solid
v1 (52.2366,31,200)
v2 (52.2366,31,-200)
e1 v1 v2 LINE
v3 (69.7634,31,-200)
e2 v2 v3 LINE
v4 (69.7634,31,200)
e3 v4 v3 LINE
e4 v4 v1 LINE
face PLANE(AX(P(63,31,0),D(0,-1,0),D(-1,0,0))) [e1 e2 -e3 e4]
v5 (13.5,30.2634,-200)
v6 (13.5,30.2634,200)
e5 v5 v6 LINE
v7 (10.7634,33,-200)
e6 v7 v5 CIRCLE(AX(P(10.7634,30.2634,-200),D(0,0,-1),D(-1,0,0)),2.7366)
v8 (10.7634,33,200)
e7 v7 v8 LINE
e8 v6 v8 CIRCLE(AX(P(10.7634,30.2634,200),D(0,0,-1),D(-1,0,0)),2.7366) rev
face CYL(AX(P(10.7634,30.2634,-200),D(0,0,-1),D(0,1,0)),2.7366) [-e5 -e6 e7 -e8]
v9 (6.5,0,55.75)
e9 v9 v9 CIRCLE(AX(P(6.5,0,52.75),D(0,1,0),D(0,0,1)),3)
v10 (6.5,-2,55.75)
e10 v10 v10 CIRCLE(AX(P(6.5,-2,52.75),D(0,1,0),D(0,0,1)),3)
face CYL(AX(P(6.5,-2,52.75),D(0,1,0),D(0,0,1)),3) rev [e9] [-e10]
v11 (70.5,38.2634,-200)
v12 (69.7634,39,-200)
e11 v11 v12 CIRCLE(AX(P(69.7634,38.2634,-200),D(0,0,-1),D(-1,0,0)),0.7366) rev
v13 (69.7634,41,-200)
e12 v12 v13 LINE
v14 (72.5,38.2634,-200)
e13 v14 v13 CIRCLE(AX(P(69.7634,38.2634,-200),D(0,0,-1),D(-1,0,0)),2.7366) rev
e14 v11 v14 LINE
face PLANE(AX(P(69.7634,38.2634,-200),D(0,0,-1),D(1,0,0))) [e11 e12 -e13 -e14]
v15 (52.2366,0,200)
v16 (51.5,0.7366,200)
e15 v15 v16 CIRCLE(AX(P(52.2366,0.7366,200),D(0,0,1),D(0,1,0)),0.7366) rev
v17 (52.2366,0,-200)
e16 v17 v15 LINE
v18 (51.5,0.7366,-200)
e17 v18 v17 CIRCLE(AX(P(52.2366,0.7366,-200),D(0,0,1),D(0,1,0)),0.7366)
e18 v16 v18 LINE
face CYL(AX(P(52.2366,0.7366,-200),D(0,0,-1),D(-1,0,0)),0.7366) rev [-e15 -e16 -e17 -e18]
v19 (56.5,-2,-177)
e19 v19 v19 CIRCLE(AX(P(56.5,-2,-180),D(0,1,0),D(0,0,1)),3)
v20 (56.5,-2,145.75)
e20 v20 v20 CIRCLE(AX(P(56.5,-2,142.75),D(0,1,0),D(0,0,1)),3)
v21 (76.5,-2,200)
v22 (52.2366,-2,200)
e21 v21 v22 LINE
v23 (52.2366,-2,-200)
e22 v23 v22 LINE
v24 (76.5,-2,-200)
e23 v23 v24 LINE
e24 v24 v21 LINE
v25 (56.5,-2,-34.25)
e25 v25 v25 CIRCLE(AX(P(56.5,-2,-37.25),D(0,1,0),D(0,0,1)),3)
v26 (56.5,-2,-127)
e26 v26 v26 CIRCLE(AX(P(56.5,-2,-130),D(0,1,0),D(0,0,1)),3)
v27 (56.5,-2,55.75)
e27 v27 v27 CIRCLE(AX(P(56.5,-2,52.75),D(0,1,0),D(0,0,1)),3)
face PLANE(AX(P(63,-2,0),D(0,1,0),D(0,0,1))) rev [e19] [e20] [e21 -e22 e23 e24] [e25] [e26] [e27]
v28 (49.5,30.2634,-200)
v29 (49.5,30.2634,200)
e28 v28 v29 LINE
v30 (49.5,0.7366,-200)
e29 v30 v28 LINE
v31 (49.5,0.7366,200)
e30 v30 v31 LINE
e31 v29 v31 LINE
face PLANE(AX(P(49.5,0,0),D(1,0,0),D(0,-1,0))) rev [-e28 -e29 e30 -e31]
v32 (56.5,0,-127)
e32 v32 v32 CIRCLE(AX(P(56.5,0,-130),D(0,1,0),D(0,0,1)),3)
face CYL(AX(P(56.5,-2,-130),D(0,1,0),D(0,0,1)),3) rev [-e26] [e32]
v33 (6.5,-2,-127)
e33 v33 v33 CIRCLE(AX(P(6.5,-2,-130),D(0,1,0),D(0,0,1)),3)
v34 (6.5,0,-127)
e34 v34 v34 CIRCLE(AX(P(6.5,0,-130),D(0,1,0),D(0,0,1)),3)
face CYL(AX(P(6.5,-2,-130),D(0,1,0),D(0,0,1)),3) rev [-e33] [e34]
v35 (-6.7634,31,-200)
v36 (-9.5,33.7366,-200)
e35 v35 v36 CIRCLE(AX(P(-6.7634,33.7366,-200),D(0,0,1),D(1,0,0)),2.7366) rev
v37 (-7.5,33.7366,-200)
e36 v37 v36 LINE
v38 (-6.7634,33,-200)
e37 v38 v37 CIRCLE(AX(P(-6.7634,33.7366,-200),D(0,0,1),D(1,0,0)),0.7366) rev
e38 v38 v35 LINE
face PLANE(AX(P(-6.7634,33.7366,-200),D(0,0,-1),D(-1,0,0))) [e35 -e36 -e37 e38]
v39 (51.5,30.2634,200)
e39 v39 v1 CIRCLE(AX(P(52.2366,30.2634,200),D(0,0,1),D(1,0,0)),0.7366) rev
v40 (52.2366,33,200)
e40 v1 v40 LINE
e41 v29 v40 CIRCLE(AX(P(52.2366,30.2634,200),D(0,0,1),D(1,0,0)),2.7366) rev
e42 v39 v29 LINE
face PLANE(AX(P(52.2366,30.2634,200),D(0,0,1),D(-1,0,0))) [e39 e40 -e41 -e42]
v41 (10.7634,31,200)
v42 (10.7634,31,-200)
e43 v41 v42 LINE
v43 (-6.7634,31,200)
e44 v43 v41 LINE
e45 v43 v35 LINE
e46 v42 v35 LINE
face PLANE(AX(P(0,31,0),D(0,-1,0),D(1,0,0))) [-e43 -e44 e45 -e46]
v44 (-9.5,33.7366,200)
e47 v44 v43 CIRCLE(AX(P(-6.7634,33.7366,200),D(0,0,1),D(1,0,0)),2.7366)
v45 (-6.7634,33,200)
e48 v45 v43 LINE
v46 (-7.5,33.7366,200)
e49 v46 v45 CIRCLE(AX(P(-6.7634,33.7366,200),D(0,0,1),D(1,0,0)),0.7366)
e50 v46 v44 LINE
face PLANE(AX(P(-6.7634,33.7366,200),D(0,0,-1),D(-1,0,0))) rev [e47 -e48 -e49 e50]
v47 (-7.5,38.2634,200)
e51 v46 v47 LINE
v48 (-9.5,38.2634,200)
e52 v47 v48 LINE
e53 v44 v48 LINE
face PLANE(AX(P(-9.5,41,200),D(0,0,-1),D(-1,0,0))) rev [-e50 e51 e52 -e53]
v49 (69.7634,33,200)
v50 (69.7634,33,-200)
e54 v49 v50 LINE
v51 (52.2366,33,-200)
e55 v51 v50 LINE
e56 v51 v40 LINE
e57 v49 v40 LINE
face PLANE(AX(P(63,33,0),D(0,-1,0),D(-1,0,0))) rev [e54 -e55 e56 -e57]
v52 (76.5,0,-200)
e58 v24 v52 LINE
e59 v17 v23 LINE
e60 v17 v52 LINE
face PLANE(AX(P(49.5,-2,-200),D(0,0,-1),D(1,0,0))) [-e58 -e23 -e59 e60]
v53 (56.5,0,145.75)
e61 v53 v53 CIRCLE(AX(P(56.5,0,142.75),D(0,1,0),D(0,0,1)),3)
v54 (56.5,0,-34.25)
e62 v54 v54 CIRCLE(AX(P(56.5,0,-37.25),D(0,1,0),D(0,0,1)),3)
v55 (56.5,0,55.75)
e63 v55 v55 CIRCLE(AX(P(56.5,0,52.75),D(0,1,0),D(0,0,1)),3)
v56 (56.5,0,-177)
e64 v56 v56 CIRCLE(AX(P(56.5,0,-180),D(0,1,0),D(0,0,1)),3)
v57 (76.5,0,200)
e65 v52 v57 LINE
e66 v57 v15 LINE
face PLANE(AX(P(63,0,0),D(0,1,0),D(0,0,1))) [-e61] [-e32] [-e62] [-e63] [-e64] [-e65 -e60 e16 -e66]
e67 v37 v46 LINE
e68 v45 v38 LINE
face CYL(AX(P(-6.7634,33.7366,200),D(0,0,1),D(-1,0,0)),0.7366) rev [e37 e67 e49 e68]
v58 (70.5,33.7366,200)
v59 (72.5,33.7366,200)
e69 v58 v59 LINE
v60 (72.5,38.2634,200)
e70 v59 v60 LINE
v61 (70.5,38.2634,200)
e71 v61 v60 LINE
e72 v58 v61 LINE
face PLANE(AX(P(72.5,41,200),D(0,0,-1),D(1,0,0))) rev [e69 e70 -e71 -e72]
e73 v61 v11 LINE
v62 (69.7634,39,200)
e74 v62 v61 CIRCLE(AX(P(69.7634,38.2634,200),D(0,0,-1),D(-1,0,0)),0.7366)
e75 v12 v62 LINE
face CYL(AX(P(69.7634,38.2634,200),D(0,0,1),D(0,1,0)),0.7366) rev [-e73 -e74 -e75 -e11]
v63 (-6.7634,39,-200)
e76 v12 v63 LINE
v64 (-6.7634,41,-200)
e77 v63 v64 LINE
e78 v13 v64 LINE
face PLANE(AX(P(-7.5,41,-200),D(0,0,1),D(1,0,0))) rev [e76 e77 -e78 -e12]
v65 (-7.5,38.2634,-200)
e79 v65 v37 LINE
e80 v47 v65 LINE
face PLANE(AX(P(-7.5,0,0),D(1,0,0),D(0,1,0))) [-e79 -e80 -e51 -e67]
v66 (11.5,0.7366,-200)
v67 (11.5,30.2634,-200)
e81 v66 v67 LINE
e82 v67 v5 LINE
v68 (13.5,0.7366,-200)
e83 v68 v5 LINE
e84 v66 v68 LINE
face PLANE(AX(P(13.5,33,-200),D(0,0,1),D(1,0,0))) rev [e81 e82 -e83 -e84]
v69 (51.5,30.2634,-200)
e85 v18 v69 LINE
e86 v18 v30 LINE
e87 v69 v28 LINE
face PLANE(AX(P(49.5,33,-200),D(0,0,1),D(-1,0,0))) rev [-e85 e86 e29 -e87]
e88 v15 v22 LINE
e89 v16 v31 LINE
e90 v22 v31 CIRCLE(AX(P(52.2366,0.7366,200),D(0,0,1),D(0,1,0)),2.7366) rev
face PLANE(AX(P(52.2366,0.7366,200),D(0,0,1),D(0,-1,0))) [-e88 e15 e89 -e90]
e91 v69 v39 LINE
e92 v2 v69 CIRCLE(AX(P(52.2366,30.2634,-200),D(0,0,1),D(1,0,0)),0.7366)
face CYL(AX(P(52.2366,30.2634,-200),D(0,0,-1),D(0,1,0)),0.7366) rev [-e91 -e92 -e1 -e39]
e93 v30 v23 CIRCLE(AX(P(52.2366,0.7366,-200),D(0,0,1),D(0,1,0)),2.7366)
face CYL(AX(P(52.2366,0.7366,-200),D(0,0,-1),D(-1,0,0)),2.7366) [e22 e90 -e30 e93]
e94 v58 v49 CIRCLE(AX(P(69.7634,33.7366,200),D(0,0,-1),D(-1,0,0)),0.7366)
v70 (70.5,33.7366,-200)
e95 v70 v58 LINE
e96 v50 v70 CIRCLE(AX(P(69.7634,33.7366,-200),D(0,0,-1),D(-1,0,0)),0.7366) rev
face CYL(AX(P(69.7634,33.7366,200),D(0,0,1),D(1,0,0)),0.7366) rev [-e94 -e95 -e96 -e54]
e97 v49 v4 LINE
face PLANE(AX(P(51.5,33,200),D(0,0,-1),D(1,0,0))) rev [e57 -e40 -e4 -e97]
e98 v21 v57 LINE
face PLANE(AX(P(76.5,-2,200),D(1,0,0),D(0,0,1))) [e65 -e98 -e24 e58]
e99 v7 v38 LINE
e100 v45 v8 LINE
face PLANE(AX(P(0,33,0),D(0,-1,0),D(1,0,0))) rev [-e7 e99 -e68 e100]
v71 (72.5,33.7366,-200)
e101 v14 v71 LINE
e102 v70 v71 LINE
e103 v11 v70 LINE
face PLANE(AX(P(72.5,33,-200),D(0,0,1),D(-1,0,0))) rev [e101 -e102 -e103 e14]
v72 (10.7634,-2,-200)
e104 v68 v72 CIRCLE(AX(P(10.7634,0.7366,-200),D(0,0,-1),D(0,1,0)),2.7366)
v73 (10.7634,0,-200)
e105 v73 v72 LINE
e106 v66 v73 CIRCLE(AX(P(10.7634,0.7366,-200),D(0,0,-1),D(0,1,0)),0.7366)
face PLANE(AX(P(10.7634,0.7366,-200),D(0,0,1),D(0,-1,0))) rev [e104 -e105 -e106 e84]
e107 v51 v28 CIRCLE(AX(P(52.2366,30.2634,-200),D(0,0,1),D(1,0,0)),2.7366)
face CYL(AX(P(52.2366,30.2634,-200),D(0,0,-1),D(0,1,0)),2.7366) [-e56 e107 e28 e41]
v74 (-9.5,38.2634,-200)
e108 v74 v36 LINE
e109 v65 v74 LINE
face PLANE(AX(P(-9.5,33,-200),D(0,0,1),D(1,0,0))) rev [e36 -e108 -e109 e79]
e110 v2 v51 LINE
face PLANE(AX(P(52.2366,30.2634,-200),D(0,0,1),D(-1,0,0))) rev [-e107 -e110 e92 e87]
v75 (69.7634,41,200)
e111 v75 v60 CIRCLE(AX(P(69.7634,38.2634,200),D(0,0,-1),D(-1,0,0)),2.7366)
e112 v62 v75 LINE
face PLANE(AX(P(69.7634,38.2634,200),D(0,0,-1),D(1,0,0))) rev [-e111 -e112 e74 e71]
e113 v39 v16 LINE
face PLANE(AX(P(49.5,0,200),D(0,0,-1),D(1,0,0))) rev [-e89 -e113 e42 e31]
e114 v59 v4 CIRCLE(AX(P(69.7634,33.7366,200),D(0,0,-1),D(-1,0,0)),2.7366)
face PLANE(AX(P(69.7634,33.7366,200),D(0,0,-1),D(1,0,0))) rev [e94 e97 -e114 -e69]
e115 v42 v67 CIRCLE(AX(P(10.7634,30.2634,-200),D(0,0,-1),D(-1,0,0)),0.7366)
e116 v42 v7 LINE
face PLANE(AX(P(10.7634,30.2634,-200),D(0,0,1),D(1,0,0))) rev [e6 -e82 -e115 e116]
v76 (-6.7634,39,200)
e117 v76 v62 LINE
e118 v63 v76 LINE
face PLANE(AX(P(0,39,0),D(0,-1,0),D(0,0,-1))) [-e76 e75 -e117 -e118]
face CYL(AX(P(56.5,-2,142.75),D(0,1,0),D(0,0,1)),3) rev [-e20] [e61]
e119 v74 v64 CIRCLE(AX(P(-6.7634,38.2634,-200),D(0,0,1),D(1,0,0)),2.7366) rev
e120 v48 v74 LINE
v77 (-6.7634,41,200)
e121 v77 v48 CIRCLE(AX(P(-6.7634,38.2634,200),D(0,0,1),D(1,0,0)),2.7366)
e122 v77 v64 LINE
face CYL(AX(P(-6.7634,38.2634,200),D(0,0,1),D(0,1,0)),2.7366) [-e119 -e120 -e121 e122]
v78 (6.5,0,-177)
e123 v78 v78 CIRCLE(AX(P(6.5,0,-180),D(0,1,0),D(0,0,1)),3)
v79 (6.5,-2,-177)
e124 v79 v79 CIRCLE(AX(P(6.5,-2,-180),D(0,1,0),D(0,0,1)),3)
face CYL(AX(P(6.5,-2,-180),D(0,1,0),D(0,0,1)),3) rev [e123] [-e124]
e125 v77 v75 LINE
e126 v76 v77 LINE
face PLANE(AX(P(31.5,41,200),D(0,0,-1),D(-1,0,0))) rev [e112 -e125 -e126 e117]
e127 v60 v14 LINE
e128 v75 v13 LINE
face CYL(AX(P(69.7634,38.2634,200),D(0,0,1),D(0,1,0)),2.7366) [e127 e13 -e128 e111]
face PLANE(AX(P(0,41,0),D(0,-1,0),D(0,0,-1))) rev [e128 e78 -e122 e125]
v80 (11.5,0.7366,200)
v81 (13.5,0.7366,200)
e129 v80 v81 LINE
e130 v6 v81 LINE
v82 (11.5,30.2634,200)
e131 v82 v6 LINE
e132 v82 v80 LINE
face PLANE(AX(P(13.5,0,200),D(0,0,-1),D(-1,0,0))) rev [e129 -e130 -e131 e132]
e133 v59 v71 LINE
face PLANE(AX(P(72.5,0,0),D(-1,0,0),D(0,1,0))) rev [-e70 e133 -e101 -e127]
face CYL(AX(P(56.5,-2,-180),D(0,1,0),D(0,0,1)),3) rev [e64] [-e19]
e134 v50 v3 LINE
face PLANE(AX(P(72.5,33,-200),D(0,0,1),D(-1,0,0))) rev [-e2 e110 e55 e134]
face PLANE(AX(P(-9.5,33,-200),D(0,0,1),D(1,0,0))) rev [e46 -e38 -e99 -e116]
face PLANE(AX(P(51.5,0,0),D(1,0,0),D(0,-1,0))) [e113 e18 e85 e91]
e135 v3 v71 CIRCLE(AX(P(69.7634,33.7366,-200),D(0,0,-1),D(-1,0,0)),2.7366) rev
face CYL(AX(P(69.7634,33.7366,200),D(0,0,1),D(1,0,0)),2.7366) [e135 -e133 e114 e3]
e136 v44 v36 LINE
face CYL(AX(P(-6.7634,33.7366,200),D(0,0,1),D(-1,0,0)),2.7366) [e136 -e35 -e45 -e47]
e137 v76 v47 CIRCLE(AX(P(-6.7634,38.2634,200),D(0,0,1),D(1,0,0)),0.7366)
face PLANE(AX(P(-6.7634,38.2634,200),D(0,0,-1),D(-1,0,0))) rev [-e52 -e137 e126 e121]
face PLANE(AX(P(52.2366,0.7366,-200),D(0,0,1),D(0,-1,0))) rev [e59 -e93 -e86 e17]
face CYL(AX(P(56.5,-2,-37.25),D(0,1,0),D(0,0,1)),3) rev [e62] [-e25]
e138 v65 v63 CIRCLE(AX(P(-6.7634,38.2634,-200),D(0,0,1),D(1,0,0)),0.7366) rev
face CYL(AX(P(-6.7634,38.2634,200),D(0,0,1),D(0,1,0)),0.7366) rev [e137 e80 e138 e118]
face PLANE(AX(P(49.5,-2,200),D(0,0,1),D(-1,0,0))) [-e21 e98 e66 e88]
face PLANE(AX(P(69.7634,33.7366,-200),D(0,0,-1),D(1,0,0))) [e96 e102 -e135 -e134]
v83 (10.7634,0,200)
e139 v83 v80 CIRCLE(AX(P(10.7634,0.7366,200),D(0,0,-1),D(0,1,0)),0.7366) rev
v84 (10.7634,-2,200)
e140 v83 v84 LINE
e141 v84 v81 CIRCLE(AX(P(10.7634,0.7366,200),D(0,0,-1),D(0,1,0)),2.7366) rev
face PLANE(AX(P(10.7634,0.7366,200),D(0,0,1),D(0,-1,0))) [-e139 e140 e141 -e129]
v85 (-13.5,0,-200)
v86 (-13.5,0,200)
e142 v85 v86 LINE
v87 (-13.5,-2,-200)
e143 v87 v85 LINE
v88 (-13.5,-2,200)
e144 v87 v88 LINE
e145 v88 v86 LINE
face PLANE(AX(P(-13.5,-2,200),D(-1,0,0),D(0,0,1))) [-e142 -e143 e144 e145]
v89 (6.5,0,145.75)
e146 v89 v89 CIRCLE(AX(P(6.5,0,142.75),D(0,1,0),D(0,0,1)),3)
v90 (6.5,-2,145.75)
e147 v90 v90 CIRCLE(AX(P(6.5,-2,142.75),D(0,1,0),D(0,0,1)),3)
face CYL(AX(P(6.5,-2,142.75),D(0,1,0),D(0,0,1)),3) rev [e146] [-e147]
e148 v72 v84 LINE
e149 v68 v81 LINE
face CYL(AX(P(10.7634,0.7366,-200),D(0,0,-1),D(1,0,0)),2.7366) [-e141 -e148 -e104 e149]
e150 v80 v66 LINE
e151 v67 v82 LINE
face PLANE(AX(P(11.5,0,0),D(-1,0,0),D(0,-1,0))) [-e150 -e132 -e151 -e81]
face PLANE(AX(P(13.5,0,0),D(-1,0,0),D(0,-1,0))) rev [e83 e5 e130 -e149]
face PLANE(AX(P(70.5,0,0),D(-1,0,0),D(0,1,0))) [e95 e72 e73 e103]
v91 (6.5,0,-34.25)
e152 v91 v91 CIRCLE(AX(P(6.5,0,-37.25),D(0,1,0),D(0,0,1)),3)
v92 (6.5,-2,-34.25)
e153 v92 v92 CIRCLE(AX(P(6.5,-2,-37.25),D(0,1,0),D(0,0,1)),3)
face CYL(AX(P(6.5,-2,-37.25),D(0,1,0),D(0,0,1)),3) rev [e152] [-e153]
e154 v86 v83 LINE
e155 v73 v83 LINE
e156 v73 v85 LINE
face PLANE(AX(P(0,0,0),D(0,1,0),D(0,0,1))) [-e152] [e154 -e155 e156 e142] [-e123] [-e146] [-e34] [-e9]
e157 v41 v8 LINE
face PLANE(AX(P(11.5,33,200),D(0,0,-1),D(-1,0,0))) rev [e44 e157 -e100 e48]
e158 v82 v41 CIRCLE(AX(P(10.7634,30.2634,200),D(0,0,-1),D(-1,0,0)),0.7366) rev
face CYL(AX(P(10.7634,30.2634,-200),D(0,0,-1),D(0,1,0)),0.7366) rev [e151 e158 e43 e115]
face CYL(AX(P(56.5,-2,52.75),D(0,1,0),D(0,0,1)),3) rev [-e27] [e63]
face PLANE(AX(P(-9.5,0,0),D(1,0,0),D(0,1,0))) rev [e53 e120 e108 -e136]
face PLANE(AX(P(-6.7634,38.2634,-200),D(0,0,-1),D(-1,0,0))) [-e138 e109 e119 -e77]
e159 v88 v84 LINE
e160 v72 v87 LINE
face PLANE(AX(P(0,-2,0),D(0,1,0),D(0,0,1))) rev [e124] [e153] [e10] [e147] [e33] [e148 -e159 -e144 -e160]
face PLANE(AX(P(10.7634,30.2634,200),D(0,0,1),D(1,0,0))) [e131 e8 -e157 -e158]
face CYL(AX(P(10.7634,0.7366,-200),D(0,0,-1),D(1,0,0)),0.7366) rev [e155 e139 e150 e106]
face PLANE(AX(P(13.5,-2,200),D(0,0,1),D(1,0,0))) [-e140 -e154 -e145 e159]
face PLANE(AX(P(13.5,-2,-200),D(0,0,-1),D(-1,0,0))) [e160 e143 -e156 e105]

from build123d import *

# Parameters (mm, degrees)
SKETCH1_W                    = 27
SKETCH1_H                    = 400
BASE_FLANGE1_DEPTH           = 2
EDGE_FLANGE1_STRIP_W         = 9.4732
EDGE_FLANGE1_STRIP_H         = 2
EDGE_FLANGE1_STRIP_CUT_DEPTH = 400
EDGE_FLANGE1_DEPTH           = 400
EDGE_FLANGE2_STRIP_W         = 9.4732
EDGE_FLANGE2_STRIP_H         = 2
EDGE_FLANGE2_STRIP_CUT_DEPTH = 400
EDGE_FLANGE2_DEPTH           = 400
EDGE_FLANGE3_STRIP_W         = 9.4732
EDGE_FLANGE3_STRIP_H         = 2
EDGE_FLANGE3_STRIP_CUT_DEPTH = 400
EDGE_FLANGE3_DEPTH           = 400
EDGE_FLANGE4_STRIP_W         = 9.4732
EDGE_FLANGE4_STRIP_H         = 2
EDGE_FLANGE4_STRIP_CUT_DEPTH = 400
EDGE_FLANGE4_DEPTH           = 400
SKETCH18_R                   = 3
CUT_EXTRUDE1_DEPTH           = 219.021214564
SKETCH19_R                   = 3
CUT_EXTRUDE2_DEPTH           = 219.021214564


# Sheet-metal steps are written as plain solids
with BuildPart() as part:
    # Sketch1 → Base-Flange1 (new body)
    with BuildSketch(Plane(origin=(0, 0, 0), x_dir=(1, 0, 0), z_dir=(0, 1, 0))):
        Rectangle(SKETCH1_W, SKETCH1_H)
    extrude(amount=-BASE_FLANGE1_DEPTH)

    # Edge-Flange1 strip (across the edge) → Edge-Flange1 strip cut (cut)
    with BuildSketch(Plane(origin=(13.5, 0, 200), x_dir=(-1, 0, 0), z_dir=(0, 0, -1))):
        with Locations((-2, -1)):
            Rectangle(EDGE_FLANGE1_STRIP_W, EDGE_FLANGE1_STRIP_H)
    extrude(amount=EDGE_FLANGE1_STRIP_CUT_DEPTH, mode=Mode.SUBTRACT)

    # Edge-Flange1 section (across the edge) → Edge-Flange1 (add)
    with BuildSketch(Plane(origin=(13.5, 0, 200), x_dir=(-1, 0, 0), z_dir=(0, 0, -1))):
        with BuildLine():
            Line((0, 0.7366), (0, 33))
            Line((0, 33), (2, 33))
            Line((2, 33), (2, 0.7366))
            ThreePointArc((2, 0.7366), (2.215745145, 0.215745145), (2.7366, 0))
            Line((2.7366, 0), (2.7366, -2))
            ThreePointArc((2.7366, -2), (0.801531583, -1.198468417), (0, 0.7366))
        make_face()
    extrude(amount=EDGE_FLANGE1_DEPTH)

    # Edge-Flange2 strip (across the edge) → Edge-Flange2 strip cut (cut)
    with BuildSketch(Plane(origin=(11.5, 33, 200), x_dir=(0, -1, 0), z_dir=(0, 0, -1))):
        with Locations((-2, -1)):
            Rectangle(EDGE_FLANGE2_STRIP_W, EDGE_FLANGE2_STRIP_H)
    extrude(amount=EDGE_FLANGE2_STRIP_CUT_DEPTH, mode=Mode.SUBTRACT)

    # Edge-Flange2 section (across the edge) → Edge-Flange2 (add)
    with BuildSketch(Plane(origin=(11.5, 33, 200), x_dir=(0, -1, 0), z_dir=(0, 0, -1))):
        with BuildLine():
            Line((0, 0.7366), (0, 21))
            Line((0, 21), (2, 21))
            Line((2, 21), (2, 0.7366))
            ThreePointArc((2, 0.7366), (2.215745145, 0.215745145), (2.7366, 0))
            Line((2.7366, 0), (2.7366, -2))
            ThreePointArc((2.7366, -2), (0.801531583, -1.198468417), (0, 0.7366))
        make_face()
    extrude(amount=EDGE_FLANGE2_DEPTH)

    # Edge-Flange3 strip (across the edge) → Edge-Flange3 strip cut (cut)
    with BuildSketch(Plane(origin=(-9.5, 33, -200), x_dir=(1, 0, 0), z_dir=(0, 0, 1))):
        with Locations((-2, -1)):
            Rectangle(EDGE_FLANGE3_STRIP_W, EDGE_FLANGE3_STRIP_H)
    extrude(amount=EDGE_FLANGE3_STRIP_CUT_DEPTH, mode=Mode.SUBTRACT)

    # Edge-Flange3 section (across the edge) → Edge-Flange3 (add)
    with BuildSketch(Plane(origin=(-9.5, 33, -200), x_dir=(1, 0, 0), z_dir=(0, 0, 1))):
        with BuildLine():
            Line((0, 0.7366), (0, 8))
            Line((0, 8), (2, 8))
            Line((2, 8), (2, 0.7366))
            ThreePointArc((2, 0.7366), (2.215745145, 0.215745145), (2.7366, 0))
            Line((2.7366, 0), (2.7366, -2))
            ThreePointArc((2.7366, -2), (0.801531583, -1.198468417), (0, 0.7366))
        make_face()
    extrude(amount=EDGE_FLANGE3_DEPTH)

    # Edge-Flange4 strip (across the edge) → Edge-Flange4 strip cut (cut)
    with BuildSketch(Plane(origin=(-7.5, 41, -200), x_dir=(0, -1, 0), z_dir=(0, 0, 1))):
        with Locations((-2, -1)):
            Rectangle(EDGE_FLANGE4_STRIP_W, EDGE_FLANGE4_STRIP_H)
    extrude(amount=EDGE_FLANGE4_STRIP_CUT_DEPTH, mode=Mode.SUBTRACT)

    # Edge-Flange4 section (across the edge) → Edge-Flange4 (add)
    with BuildSketch(Plane(origin=(-7.5, 41, -200), x_dir=(0, -1, 0), z_dir=(0, 0, 1))):
        with BuildLine():
            Line((0, 0.7366), (0, 39))
            Line((0, 39), (2, 39))
            Line((2, 39), (2, 0.7366))
            ThreePointArc((2, 0.7366), (2.215745145, 0.215745145), (2.7366, 0))
            Line((2.7366, 0), (2.7366, -2))
            ThreePointArc((2.7366, -2), (0.801531583, -1.198468417), (0, 0.7366))
        make_face()
    extrude(amount=EDGE_FLANGE4_DEPTH)

    # Mirror1: part across plane


with BuildPart() as part_1:
    add(part.part)
    add(part.part.mirror(Plane(origin=(31.5, 41, -200), x_dir=(0, 0, 1), z_dir=(-1, 0, 0))))

    # Sketch18 → Cut-Extrude1 (cut, through all)
    with BuildSketch(Plane(origin=(0, 0, 0), x_dir=(1, 0, 0), z_dir=(0, 1, 0))):
        with Locations(Location((6.5, 180, 0), (0, 0, 270))):
            Circle(SKETCH18_R)
        with Locations(Location((56.5, 130, 0), (0, 0, 270))):
            Circle(SKETCH18_R)
        with Locations(Location((56.5, 180, 0), (0, 0, 270))):
            Circle(SKETCH18_R)
        with Locations(Location((6.5, 130, 0), (0, 0, 270))):
            Circle(SKETCH18_R)
    extrude(amount=-CUT_EXTRUDE1_DEPTH, mode=Mode.SUBTRACT)

    # Sketch19 → Cut-Extrude2 (cut, through all)
    with BuildSketch(Plane(origin=(0, 0, 0), x_dir=(1, 0, 0), z_dir=(0, 1, 0))):
        with Locations(Location((56.5, -142.75, 0), (0, 0, 270))):
            Circle(SKETCH19_R)
        with Locations(Location((56.5, -52.75, 0), (0, 0, 270))):
            Circle(SKETCH19_R)
        with Locations(Location((56.5, 37.25, 0), (0, 0, 270))):
            Circle(SKETCH19_R)
        with Locations(Location((6.5, 37.25, 0), (0, 0, 270))):
            Circle(SKETCH19_R)
        with Locations(Location((6.5, -52.75, 0), (0, 0, 270))):
            Circle(SKETCH19_R)
        with Locations(Location((6.5, -142.75, 0), (0, 0, 270))):
            Circle(SKETCH19_R)
    extrude(amount=-CUT_EXTRUDE2_DEPTH, mode=Mode.SUBTRACT)


solid = part_1.part
